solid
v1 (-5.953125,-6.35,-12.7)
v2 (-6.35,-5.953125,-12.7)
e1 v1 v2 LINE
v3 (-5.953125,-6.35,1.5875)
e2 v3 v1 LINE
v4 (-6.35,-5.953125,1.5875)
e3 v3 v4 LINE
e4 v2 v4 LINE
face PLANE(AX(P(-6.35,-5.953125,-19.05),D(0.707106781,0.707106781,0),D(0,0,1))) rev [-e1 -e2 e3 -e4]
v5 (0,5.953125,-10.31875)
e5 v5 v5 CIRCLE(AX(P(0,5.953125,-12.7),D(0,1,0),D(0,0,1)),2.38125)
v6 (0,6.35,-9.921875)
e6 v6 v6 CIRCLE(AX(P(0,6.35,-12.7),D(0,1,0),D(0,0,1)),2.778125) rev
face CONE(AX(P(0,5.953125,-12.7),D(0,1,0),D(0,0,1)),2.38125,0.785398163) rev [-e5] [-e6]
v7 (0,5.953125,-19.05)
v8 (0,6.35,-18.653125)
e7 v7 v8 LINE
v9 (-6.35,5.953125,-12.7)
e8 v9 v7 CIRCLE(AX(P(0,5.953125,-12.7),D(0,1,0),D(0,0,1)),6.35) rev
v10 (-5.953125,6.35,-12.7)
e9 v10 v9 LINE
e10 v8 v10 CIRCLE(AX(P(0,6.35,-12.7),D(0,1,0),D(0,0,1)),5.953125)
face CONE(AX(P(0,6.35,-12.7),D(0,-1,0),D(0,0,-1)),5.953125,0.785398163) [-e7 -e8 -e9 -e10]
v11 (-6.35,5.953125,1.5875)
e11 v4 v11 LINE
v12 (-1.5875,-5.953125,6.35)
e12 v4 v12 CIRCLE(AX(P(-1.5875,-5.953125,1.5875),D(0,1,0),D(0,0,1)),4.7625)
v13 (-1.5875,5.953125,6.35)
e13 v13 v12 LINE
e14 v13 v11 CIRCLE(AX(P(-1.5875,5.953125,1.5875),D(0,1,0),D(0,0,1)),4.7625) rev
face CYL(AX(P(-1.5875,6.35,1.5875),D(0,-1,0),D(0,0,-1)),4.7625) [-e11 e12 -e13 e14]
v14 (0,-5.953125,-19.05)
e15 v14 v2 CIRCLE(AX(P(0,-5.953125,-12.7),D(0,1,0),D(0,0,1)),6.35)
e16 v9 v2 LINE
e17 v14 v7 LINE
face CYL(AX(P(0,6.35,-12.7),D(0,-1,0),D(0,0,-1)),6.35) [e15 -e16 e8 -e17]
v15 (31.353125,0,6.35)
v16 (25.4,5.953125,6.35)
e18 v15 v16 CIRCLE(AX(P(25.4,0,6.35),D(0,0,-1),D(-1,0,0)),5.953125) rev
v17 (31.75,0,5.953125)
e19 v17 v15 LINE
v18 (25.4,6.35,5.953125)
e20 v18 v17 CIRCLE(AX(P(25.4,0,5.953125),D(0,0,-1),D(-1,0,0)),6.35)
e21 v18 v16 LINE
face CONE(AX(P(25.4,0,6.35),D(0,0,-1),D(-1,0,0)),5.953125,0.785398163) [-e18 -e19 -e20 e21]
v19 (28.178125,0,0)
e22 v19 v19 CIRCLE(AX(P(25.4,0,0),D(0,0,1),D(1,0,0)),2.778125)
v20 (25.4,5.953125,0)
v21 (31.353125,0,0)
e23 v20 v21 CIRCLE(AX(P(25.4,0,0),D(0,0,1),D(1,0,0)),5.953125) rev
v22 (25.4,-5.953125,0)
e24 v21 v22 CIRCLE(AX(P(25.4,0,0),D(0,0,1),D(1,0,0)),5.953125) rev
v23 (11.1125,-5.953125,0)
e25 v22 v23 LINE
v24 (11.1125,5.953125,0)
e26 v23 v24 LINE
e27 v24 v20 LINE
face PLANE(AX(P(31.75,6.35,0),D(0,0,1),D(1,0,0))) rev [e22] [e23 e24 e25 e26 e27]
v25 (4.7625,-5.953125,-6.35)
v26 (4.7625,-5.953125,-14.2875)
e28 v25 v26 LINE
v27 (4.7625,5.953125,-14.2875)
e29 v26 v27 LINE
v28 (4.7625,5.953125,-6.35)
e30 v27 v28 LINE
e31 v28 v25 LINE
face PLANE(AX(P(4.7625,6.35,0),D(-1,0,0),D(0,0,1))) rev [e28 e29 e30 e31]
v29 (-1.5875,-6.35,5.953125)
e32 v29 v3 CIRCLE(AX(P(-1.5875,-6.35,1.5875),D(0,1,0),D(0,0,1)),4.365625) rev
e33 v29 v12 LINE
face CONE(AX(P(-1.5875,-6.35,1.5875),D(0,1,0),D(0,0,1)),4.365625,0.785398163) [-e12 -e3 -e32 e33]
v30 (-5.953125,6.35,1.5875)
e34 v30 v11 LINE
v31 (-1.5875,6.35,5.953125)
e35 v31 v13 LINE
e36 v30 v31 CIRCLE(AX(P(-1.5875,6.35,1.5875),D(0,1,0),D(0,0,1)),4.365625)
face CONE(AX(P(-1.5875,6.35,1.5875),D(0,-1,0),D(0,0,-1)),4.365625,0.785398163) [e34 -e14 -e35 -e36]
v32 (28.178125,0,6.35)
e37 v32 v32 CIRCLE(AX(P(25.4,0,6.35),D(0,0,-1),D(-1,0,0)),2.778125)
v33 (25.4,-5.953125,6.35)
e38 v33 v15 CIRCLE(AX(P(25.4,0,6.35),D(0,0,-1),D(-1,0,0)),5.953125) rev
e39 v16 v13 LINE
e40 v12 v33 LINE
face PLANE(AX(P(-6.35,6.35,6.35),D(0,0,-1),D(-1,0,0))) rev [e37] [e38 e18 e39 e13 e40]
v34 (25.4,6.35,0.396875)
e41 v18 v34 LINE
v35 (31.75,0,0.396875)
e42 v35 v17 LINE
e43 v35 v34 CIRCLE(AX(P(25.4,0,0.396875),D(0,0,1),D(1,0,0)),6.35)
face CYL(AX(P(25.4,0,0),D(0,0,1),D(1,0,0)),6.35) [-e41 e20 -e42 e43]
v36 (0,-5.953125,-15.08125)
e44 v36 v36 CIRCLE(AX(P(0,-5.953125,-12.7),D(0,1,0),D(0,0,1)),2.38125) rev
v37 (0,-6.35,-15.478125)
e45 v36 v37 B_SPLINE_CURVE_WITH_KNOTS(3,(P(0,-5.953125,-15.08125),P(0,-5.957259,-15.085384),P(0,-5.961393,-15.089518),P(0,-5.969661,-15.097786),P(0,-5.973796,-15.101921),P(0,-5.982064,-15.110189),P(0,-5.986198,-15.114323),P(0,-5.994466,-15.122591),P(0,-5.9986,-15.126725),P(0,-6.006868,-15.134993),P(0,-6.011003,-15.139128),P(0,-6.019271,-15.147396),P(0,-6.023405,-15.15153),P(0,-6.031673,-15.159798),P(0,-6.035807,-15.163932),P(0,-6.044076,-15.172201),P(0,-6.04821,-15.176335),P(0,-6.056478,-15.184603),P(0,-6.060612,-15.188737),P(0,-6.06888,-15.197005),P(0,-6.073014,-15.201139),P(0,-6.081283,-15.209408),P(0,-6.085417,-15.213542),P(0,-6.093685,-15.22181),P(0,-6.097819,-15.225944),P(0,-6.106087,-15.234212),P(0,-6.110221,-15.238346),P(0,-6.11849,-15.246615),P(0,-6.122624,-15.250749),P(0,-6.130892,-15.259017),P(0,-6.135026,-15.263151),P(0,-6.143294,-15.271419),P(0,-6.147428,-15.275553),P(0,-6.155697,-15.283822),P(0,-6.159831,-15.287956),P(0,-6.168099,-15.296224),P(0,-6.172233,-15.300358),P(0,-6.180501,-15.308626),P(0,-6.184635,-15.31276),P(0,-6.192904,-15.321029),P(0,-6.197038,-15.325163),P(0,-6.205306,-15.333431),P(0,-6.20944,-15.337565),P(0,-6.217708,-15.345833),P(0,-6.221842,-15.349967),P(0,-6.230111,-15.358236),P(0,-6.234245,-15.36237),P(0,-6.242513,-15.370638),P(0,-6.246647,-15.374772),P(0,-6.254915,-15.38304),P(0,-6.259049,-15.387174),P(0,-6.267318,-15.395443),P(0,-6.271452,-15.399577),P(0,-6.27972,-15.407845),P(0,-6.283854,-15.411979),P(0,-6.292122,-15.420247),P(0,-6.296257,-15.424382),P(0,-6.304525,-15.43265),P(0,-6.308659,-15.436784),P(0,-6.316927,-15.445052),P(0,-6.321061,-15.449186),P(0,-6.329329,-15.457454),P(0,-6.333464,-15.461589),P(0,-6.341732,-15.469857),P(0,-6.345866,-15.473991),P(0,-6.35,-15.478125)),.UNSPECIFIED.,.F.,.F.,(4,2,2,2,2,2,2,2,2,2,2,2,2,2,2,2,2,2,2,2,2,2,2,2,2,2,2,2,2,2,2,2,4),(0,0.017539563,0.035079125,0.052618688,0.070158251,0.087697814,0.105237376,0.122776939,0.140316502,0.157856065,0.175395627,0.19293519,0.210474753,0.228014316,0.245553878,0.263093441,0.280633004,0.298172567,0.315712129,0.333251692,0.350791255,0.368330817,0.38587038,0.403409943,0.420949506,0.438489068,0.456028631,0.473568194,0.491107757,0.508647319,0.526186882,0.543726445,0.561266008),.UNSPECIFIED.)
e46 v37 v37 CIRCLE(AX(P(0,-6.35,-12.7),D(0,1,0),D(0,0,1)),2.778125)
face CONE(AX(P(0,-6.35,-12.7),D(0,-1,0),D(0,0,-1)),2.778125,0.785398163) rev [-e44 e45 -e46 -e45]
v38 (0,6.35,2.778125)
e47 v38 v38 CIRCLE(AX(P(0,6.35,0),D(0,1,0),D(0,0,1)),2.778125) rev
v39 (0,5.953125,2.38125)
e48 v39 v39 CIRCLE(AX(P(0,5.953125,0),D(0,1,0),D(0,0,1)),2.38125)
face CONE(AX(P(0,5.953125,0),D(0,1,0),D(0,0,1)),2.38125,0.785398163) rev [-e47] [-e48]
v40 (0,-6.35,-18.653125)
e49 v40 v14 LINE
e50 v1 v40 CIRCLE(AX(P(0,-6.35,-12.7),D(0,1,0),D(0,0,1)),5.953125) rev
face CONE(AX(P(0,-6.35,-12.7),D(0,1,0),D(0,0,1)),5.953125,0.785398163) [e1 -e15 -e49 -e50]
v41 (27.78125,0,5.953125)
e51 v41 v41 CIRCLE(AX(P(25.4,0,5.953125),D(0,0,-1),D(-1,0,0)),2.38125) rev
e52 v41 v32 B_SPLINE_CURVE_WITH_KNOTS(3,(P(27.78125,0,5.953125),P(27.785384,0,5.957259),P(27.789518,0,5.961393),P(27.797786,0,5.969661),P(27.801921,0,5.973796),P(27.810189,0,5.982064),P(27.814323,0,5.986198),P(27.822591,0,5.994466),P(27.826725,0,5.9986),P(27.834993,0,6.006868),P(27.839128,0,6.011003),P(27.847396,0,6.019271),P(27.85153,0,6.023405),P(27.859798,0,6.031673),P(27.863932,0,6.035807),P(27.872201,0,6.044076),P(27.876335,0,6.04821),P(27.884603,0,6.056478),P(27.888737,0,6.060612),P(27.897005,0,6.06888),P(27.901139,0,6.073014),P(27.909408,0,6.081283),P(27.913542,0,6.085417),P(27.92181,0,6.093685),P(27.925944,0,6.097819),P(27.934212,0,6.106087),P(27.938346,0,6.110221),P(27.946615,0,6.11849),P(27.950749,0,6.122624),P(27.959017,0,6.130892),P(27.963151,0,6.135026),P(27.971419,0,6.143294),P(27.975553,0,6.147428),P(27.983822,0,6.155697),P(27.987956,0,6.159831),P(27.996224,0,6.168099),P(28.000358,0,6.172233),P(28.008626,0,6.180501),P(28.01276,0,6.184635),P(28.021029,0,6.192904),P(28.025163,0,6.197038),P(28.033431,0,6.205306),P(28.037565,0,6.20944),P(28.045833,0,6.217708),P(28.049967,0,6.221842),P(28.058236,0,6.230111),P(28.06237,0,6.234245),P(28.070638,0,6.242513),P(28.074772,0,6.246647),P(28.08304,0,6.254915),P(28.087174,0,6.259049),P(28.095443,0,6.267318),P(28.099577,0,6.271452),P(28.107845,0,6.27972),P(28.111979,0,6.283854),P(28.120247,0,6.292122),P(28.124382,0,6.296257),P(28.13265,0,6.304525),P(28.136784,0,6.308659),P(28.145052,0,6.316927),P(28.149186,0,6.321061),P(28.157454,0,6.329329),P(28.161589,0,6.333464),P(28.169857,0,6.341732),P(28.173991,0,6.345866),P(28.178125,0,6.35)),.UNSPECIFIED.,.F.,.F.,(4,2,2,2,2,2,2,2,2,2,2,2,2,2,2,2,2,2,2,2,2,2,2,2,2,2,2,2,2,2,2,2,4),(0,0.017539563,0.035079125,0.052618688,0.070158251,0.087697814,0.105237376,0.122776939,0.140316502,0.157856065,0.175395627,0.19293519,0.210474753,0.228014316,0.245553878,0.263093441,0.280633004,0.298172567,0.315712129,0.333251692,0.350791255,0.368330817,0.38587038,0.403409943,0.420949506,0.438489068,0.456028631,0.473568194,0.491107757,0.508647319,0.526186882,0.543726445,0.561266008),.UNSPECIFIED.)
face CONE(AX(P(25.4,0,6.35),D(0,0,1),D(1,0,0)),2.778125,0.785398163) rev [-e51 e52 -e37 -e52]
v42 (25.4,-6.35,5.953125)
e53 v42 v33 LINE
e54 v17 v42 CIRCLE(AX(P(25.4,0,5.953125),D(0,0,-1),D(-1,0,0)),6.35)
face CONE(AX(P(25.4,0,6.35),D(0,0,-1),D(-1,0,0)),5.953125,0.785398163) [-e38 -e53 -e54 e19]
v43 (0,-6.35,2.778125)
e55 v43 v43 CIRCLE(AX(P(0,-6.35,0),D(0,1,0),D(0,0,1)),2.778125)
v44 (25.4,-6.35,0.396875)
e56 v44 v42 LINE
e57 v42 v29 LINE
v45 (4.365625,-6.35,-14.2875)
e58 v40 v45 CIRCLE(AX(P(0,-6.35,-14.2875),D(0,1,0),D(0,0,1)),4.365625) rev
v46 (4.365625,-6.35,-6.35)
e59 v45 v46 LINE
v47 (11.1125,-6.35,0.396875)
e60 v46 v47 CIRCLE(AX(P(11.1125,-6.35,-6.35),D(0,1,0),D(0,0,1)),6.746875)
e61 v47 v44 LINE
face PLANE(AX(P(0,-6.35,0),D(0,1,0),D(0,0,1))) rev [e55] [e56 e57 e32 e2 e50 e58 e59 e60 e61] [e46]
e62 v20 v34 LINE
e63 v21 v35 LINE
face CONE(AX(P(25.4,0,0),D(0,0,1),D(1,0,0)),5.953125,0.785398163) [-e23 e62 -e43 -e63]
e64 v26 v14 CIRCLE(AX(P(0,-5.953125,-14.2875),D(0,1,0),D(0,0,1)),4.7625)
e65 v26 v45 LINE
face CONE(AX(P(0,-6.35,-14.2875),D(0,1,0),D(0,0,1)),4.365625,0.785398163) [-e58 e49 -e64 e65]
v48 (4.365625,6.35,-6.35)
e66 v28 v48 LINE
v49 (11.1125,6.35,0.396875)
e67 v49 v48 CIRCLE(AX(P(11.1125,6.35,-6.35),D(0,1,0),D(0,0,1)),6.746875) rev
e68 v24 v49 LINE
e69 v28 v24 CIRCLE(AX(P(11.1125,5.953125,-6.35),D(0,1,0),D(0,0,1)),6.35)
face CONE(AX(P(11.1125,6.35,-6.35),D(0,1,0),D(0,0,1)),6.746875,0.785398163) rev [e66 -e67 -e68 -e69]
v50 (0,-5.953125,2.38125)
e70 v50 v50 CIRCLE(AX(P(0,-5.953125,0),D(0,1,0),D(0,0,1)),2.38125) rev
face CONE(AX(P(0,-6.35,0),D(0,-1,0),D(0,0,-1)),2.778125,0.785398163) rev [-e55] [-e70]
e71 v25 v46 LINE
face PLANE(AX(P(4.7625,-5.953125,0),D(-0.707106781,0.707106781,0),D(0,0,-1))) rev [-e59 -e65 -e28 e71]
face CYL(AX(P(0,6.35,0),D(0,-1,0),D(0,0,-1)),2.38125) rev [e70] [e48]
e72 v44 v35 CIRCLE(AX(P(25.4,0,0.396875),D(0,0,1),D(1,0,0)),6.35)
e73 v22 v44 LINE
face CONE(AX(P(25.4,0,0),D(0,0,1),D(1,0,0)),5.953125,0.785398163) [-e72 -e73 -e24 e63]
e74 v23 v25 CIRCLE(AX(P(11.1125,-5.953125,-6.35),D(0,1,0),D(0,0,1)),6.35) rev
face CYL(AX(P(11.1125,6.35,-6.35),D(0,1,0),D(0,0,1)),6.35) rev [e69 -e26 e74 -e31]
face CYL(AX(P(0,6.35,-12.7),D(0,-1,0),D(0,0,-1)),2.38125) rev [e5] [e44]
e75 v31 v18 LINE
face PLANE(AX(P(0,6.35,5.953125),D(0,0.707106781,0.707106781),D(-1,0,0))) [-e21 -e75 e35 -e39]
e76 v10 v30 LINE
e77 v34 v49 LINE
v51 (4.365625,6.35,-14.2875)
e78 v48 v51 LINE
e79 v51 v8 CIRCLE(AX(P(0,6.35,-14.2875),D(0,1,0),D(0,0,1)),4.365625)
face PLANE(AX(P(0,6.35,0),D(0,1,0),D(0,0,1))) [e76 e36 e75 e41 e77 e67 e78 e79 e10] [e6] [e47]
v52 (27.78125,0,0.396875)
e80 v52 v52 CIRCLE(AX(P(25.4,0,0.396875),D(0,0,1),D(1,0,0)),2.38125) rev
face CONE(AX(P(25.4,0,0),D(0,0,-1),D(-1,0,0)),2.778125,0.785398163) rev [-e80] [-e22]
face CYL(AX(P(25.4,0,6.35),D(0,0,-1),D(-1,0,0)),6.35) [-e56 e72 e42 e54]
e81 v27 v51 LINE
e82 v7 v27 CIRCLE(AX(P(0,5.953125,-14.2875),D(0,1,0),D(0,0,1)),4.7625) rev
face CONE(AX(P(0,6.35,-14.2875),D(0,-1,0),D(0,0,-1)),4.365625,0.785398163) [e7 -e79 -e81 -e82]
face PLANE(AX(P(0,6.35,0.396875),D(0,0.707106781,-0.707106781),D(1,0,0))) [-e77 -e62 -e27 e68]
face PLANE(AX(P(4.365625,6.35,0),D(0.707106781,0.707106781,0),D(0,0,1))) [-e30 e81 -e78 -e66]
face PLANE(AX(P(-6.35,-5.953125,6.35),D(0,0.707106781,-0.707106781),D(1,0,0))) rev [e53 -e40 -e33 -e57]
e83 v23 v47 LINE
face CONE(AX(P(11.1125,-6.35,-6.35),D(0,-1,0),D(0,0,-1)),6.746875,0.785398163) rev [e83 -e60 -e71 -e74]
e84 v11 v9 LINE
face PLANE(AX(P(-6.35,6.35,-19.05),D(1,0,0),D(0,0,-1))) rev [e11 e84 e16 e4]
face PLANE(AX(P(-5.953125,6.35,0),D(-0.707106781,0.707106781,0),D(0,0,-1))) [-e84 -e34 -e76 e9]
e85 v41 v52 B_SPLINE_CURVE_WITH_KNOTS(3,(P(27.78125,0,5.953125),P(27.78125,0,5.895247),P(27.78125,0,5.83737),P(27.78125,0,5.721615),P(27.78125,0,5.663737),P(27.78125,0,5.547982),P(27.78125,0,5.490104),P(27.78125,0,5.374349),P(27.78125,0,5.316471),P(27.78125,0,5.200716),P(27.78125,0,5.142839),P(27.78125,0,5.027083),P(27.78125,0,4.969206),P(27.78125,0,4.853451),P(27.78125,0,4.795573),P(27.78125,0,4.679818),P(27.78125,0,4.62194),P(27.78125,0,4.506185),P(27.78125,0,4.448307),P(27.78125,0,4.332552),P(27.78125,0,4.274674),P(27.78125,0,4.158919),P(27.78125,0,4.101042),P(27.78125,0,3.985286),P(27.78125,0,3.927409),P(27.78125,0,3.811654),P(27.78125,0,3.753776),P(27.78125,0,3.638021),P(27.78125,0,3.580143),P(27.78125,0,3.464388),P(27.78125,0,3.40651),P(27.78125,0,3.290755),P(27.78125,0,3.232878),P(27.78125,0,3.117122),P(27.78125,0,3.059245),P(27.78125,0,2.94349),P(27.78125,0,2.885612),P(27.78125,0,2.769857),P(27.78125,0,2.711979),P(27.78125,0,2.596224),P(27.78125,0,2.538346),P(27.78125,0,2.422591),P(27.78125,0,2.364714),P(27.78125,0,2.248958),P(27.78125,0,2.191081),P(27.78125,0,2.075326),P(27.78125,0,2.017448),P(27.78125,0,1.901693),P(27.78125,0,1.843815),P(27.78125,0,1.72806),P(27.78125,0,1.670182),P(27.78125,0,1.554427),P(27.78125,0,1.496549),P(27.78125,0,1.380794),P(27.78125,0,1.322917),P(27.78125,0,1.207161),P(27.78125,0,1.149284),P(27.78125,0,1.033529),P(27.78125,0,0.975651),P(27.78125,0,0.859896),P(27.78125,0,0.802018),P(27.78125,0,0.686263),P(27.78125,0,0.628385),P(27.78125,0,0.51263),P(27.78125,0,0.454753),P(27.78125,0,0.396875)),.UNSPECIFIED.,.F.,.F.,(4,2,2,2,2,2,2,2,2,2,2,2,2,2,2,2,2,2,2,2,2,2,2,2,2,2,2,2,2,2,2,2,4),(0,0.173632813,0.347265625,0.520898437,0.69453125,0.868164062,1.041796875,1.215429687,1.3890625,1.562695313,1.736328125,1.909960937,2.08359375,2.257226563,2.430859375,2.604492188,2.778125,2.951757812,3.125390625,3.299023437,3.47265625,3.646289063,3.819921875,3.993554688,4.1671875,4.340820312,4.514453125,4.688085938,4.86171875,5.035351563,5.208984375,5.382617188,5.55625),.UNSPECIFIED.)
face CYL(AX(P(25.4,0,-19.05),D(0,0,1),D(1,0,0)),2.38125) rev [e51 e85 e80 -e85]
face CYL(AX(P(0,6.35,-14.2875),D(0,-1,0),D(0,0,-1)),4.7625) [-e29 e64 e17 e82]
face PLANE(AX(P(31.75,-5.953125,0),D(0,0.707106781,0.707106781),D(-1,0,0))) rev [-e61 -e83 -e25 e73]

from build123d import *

# Parameters (mm, degrees)
SKETCH1_R               = 2.38125
BOSS_EXTRUDE1_DEPTH     = 6.35
CUT_EXTRUDE1_DEPTH      = 42.152703435
CUT_EXTRUDE1_DEPTH_BACK = 42.152703435
SKETCH2_R               = 2.38125
FILLET1_R               = 6.35
FILLET2_R               = 4.7625
CHAMFER1_SIZE           = 0.396875


with BuildPart() as part:
    # Sketch1 → Boss-Extrude1 (new, symmetric)
    with BuildSketch(Plane(origin=(0, 0, 0), x_dir=(1, 0, 0), z_dir=(0, 1, 0))):
        Polygon((-6.35, -6.35), (31.75, -6.35), (31.75, 0), (4.7625, 0), (4.7625, 19.05), (-6.35, 19.05), align=None)
        with Locations(Location((0, 0, 0), (0, 0, 270))):
            Circle(SKETCH1_R, mode=Mode.SUBTRACT)
        with Locations(Location((0, 12.7, 0), (0, 0, 270))):
            Circle(SKETCH1_R, mode=Mode.SUBTRACT)
    extrude(amount=BOSS_EXTRUDE1_DEPTH, both=True)

    # Sketch2 → Cut-Extrude1 (cut, two sides: drawn at the far end of the back side and taken through both)
    with BuildSketch(Plane.XY.offset(6.35).offset(-CUT_EXTRUDE1_DEPTH_BACK)):
        with Locations((25.4, 0)):
            Circle(SKETCH2_R)
    extrude(amount=CUT_EXTRUDE1_DEPTH + CUT_EXTRUDE1_DEPTH_BACK, mode=Mode.SUBTRACT)

    # Fillet1
    fillet1_edges = [part.edges().sort_by_distance(p)[0] for p in [
        (-6.35, 0, -19.05),
        (4.7625, 0, 0),
        (31.75, -6.35, 3.175),
        (31.75, 6.35, 3.175),
    ]]
    fillet(fillet1_edges, radius=FILLET1_R - 0.0001)  # a hair under: the kernel refuses the full size

    # Fillet2
    fillet2_edges = [part.edges().sort_by_distance(p)[0] for p in [
        (-6.35, 0, 6.35),
        (4.7625, 0, -19.05),
    ]]
    fillet(fillet2_edges, radius=FILLET2_R)

    # Chamfer1
    chamfer1_edges = [part.edges().sort_by_distance(p)[0] for p in [
        (0, -6.35, -2.38125),
        (0, 6.35, -2.38125),
        (0, -6.35, -15.08125),
        (0, 6.35, -15.08125),
        (23.01875, 0, 0),
        (23.01875, 0, 6.35),
        (-6.35, -6.35, -5.5563),
        (-6.35, 6.35, -5.5563),
        (4.7625, -6.35, -10.3187),
        (18.25625, -6.35, 0),
        (-4.49015735, -6.35, -17.19015735),
        (18.25625, 6.35, 0),
        (4.7625, 6.35, -10.3187),
        (-4.49015735, 6.35, -17.19015735),
        (29.89015735, 4.49015735, 0),
        (29.89015735, -4.49015735, 0),
        (29.89015735, 4.49015735, 6.35),
        (29.89015735, -4.49015735, 6.35),
        (6.62234265, -6.35, -1.85984265),
        (6.62234265, 6.35, -1.85984265),
        (11.9063, -6.35, 6.35),
        (11.9063, 6.35, 6.35),
        (3.367596045, -6.35, -17.655096045),
        (-4.955096045, -6.35, 4.955096045),
        (3.367596045, 6.35, -17.655096045),
        (-4.955096045, 6.35, 4.955096045),
    ]]
    chamfer(chamfer1_edges, length=CHAMFER1_SIZE)


solid = part.part
